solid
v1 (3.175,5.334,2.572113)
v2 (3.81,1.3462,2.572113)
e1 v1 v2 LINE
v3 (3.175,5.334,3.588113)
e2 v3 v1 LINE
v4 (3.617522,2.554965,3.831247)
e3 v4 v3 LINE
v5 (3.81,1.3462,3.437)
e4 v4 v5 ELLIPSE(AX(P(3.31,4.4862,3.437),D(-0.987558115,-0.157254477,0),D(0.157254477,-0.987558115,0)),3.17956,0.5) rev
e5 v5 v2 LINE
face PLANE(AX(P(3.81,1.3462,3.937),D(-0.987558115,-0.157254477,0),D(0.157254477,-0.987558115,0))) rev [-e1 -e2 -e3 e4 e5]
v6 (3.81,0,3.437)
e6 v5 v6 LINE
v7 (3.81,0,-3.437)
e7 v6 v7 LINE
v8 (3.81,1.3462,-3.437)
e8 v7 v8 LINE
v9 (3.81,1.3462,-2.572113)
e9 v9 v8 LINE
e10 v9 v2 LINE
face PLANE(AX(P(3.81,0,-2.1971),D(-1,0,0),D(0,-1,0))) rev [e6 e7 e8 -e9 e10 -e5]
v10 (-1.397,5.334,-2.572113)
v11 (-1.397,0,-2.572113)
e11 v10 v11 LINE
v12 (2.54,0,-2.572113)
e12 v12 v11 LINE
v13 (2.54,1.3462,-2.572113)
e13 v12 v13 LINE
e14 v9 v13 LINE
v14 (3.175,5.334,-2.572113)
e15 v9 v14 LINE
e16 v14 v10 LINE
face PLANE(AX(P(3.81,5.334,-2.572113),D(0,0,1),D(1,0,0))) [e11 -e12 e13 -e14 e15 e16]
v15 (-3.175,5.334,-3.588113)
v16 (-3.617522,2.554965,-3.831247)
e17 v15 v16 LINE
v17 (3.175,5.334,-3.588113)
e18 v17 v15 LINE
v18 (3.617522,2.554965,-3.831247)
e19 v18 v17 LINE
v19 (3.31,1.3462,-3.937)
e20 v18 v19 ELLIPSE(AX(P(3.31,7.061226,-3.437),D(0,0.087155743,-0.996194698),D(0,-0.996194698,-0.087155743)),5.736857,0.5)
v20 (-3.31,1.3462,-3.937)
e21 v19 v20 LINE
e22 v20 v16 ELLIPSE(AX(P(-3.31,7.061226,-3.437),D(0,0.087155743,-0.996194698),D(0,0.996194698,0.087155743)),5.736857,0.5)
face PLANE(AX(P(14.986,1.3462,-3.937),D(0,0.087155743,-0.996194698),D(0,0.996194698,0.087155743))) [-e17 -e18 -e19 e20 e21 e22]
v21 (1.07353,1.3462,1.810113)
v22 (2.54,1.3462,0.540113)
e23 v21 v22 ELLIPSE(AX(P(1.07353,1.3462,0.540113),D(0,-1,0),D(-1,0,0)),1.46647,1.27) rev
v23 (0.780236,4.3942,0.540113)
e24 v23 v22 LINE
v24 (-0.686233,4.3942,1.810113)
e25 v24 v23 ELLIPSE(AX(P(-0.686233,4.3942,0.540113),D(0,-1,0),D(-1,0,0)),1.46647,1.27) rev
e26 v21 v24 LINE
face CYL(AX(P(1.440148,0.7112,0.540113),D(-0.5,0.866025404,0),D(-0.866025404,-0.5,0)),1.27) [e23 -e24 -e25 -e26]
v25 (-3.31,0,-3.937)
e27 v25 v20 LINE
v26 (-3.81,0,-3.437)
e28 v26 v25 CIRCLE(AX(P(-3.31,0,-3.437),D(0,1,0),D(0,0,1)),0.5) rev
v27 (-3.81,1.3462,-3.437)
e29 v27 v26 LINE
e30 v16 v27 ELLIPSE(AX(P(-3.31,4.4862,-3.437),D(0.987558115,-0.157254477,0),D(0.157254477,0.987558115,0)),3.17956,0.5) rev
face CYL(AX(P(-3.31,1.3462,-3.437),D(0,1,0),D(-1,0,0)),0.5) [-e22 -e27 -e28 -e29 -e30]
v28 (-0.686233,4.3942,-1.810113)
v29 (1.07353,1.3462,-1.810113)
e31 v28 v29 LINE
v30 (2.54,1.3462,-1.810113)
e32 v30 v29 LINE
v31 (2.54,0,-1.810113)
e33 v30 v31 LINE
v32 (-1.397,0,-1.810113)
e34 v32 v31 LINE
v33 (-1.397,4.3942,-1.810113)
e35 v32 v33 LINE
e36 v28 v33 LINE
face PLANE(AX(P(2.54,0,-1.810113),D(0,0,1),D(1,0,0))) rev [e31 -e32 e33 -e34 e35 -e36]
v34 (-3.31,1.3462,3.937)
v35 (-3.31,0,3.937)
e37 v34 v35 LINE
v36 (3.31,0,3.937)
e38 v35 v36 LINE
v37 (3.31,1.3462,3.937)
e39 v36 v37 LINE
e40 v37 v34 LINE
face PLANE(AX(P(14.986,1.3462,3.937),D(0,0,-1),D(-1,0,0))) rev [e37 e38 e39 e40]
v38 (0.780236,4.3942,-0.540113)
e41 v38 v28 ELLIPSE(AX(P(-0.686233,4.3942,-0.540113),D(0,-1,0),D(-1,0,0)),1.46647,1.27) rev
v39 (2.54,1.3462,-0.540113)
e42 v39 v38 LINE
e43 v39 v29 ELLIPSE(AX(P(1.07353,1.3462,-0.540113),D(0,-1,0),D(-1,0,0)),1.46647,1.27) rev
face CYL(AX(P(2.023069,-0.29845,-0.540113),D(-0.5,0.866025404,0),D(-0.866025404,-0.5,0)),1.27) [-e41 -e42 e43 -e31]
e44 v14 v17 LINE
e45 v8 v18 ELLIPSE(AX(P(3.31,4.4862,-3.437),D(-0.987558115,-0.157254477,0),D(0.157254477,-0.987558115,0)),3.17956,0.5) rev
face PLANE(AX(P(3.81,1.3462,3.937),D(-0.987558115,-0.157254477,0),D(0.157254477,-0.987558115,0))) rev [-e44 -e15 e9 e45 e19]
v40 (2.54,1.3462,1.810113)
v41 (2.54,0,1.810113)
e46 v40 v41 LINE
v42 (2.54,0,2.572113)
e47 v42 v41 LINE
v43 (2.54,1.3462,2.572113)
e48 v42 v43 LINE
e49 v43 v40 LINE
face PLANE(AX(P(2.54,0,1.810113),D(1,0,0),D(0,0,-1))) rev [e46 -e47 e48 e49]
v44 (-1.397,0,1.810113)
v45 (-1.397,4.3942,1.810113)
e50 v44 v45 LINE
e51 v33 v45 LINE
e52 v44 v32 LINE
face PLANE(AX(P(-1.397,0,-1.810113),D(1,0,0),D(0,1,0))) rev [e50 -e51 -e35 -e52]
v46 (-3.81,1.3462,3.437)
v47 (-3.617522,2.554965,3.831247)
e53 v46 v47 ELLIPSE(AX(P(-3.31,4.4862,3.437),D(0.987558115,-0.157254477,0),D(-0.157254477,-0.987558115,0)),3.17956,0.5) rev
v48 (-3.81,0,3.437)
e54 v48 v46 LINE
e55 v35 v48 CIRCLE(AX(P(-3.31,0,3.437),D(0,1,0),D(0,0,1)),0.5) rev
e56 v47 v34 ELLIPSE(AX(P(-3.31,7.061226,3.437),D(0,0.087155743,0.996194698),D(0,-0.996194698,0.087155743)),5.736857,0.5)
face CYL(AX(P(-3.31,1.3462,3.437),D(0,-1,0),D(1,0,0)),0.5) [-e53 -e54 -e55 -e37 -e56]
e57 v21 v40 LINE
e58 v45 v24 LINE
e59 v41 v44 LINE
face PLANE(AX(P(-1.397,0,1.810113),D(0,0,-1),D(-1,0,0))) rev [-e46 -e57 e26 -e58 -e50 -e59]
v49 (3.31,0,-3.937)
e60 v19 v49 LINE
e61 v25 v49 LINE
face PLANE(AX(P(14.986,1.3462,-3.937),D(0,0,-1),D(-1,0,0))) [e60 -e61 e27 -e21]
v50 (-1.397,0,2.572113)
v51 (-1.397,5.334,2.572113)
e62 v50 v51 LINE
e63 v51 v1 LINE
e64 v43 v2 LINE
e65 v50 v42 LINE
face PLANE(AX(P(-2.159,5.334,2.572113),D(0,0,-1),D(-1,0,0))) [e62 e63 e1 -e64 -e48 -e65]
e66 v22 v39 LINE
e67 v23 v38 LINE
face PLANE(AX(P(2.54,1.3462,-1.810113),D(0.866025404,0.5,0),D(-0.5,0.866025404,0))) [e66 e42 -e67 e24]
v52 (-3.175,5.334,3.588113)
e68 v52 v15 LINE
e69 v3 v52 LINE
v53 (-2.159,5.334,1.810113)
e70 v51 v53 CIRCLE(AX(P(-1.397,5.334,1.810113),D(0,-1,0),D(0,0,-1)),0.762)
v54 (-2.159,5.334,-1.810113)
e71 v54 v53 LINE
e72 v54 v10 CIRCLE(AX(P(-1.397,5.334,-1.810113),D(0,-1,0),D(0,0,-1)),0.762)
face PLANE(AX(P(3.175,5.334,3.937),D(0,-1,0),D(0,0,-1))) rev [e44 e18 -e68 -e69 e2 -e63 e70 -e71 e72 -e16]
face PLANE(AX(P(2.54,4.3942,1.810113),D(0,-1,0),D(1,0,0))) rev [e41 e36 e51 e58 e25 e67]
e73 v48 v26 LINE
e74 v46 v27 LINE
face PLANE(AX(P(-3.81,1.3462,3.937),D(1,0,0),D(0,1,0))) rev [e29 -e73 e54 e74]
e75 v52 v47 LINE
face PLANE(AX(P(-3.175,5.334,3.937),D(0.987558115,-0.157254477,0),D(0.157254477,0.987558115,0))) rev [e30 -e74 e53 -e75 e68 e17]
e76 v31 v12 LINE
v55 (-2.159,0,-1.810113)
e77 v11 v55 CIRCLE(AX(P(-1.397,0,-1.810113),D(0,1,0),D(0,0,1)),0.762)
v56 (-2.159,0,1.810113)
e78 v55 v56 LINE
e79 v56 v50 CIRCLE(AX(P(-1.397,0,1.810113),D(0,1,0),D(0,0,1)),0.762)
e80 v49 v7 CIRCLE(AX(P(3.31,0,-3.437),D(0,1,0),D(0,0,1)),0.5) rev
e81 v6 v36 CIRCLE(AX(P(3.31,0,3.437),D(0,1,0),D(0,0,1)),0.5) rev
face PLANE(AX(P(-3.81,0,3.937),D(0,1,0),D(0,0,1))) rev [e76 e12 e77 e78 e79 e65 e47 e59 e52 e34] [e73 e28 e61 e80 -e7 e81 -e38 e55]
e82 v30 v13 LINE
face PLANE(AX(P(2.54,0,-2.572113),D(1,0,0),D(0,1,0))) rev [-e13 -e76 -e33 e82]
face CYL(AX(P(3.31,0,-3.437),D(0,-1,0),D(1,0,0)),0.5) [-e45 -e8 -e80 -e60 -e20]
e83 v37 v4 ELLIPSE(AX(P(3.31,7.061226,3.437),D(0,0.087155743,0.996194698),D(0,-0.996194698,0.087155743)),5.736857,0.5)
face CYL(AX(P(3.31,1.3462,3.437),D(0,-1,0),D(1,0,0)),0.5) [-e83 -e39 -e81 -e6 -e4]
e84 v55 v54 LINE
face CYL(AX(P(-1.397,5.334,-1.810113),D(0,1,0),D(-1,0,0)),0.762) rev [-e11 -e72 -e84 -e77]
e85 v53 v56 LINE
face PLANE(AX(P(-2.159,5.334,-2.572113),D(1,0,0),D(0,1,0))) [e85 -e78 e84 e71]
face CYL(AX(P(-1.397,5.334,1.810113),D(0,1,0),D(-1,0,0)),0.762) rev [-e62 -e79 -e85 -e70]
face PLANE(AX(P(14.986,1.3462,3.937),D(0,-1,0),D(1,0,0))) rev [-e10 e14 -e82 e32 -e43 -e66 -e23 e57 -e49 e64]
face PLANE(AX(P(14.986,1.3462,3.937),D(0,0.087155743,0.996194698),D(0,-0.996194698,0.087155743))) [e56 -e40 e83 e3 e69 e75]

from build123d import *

# Parameters (mm, degrees)
EXTRUDE1_DEPTH      = 3.937
DRAFT1_START        = -3.81
DRAFT1_DEPTH        = 7.62
SKETCH3_W           = 5.969
SKETCH3_H           = 5.144225416
CUT_EXTRUDE1_DEPTH  = 16.999459798
CUT_EXTRUDE2_DEPTH  = 16.999459798
SKETCH5_W           = 3.937
SKETCH5_H           = 3.620225416
EXTRUDE2_DEPTH      = 3.048
DRAFT2_ANGLE        = 30
FILLET1_R           = 1.27
FILLET2_R           = 0.762
SKETCH6_W           = 3.937
SKETCH6_H           = 3.620225416
EXTRUDE3_DEPTH      = 1.3462
CUT_EXTRUDE3_DEPTH  = 16.999459798
SKETCH12_W          = 4.3942
SKETCH12_H          = 1.3462
BOSS_EXTRUDE1_DEPTH = 70
CUT_EXTRUDE8_DEPTH  = 1.524
LPATTERN1_START     = -1.524
LPATTERN1_DEPTH     = 3.048
CUT_EXTRUDE9_DEPTH  = 86.170550743
FILLET3_R           = 1
CUT_EXTRUDE10_DEPTH = 85.172743295
FILLET4_R           = 0.5
CUT_EXTRUDE11_START = -1.3462
CUT_EXTRUDE11_DEPTH = 1.3462


# Read off the part's stored shape, not the designer's step: Draft1, LPattern1, Cut-Extrude11
with BuildPart() as part:
    # Sketch1 → Extrude1 (new, symmetric)
    with BuildSketch(Plane.XY):
        Polygon((3.81, 1.3462), (3.175, 5.334), (-3.175, 5.334), (-3.81, 1.3462), (-3.81, 0), (14.986, 0), (14.986, 1.3462), align=None)
    extrude(amount=EXTRUDE1_DEPTH, both=True)

    # Draft1 outline → Draft1 (cut)
    with BuildSketch(Plane.YZ.offset(DRAFT1_START)):
        Polygon((1.3462, 3.937), (5.334, 3.588112708), (5.334, 3.937), align=None)
        Polygon((5.334, -3.588112708), (1.3462, -3.937), (5.334, -3.937), align=None)
    extrude(amount=DRAFT1_DEPTH, mode=Mode.SUBTRACT)

    # Sketch3 → Cut-Extrude1 (cut, through all)
    with BuildSketch(Plane(origin=(0, 1.3462, 0), x_dir=(-1, 0, 0), z_dir=(0, 1, 0))):
        with Locations((-0.8255, 0)):
            Rectangle(SKETCH3_W, SKETCH3_H)
    extrude(amount=CUT_EXTRUDE1_DEPTH, mode=Mode.SUBTRACT)

    # Sketch4 → Cut-Extrude2 (cut, through all)
    with BuildSketch(Plane(origin=(0, 1.3462, 0), x_dir=(-1, 0, 0), z_dir=(0, 1, 0))):
        Polygon((2.159, 2.572112708), (-2.54, 2.572112708), (-2.54, 1.810112708), (1.397, 1.810112708), (1.397, -1.810112708), (-2.54, -1.810112708), (-2.54, -2.572112708), (2.159, -2.572112708), align=None)
    extrude(amount=-CUT_EXTRUDE2_DEPTH, mode=Mode.SUBTRACT)

    # Sketch5 → Extrude2 (add)
    with BuildSketch(Plane(origin=(0, 1.3462, 0), x_dir=(-1, 0, 0), z_dir=(0, 1, 0))):
        with Locations((-0.5715, 0)):
            Rectangle(SKETCH5_W, SKETCH5_H)
    extrude(amount=EXTRUDE2_DEPTH)

    # Draft2
    draft2_faces = [part.faces().sort_by_distance(p)[0] for p in [
        (2.54, 2.8702, 0),
    ]]
    draft(draft2_faces, Plane(origin=(14.986, 1.3462, 3.937), x_dir=(1, 0, 0), z_dir=(0, 1, 0)), DRAFT2_ANGLE)

    # Fillet1
    # the kernel refuses this fillet: 1.27 mm, written as the material it takes off along each edge
    with BuildSketch(Plane(origin=(4.1275, -1.403430657, 1.810112708), x_dir=(-0.866025403784438, -0.500000000000001, 0), z_dir=(-0.500000000000001, 0.866025403784438, 0))) as fillet1_piece_1_section:
        with BuildLine():
            CenterArc((FILLET1_R, -FILLET1_R), FILLET1_R, 90, 90)
            Line((0, -FILLET1_R), (0, 0))
            Line((0, 0), (FILLET1_R, 0))
        make_face()
    fillet1_piece_1 = extrude(amount=9.869527241, mode=Mode.PRIVATE)
    fillet1_piece_1 = split(fillet1_piece_1, bisect_by=Plane(origin=(2.54, 0.912532514, 1.637821639), z_dir=(-1, 0, 0)), keep=Keep.TOP, mode=Mode.PRIVATE)
    add(fillet1_piece_1, mode=Mode.SUBTRACT)
    with BuildSketch(Plane(origin=(4.1275, -1.403430657, -1.810112708), x_dir=(-0.8660254037844382, -0.500000000000001, 0), z_dir=(-0.500000000000001, 0.866025403784438, 0))) as fillet1_piece_2_section:
        with BuildLine():
            CenterArc((FILLET1_R, FILLET1_R), FILLET1_R, 180, 90)
            Line((0, FILLET1_R), (0, 0))
            Line((0, 0), (FILLET1_R, 0))
        make_face()
    fillet1_piece_2 = extrude(amount=9.869527241, mode=Mode.PRIVATE)
    fillet1_piece_2 = split(fillet1_piece_2, bisect_by=Plane(origin=(2.54, 0.912532514, -1.637821639), z_dir=(-1, 0, 0)), keep=Keep.TOP, mode=Mode.PRIVATE)
    add(fillet1_piece_2, mode=Mode.SUBTRACT)

    # Fillet2
    fillet2_edges = [part.edges().sort_by_distance(p)[0] for p in [
        (-2.159, 2.667, 2.572112708),
        (-2.159, 2.667, -2.572112708),
    ]]
    fillet(fillet2_edges, radius=FILLET2_R)

    # Sketch6 → Extrude3 (add)
    with BuildSketch(Plane.XZ):
        with Locations((0.5715, 0)):
            Rectangle(SKETCH6_W, SKETCH6_H)
    extrude(amount=-EXTRUDE3_DEPTH)

    # Sketch7 → Cut-Extrude3 (cut, through all)
    with BuildSketch(Plane(origin=(0, 1.3462, 0), x_dir=(-1, 0, 0), z_dir=(0, 1, 0))):
        Polygon((-14.986, 3.937), (-3.81, 3.937), (-10.668, 2.1971), (-14.986, 2.1971), align=None)
        Polygon((-14.986, -3.937), (-3.81, -3.937), (-10.668, -2.1971), (-14.986, -2.1971), align=None)
    extrude(amount=-CUT_EXTRUDE3_DEPTH, mode=Mode.SUBTRACT)

    # Sketch12 → Boss-Extrude1 (add)
    with BuildSketch(Plane(origin=(14.986, 0, 0), x_dir=(0, 0, -1), z_dir=(1, 0, 0))):
        with Locations((0, 0.6731)):
            Rectangle(SKETCH12_W, SKETCH12_H)
    extrude(amount=BOSS_EXTRUDE1_DEPTH)

    # Sketch11 → Cut-Extrude8 (cut, symmetric)
    with BuildSketch(Plane.XY):
        Polygon((10.668, 1.3462), (10.668, 1.0922), (11.684, 1.3462), (11.684, 1.637608524), (10.668, 1.637608524), align=None)
    extrude(amount=CUT_EXTRUDE8_DEPTH, both=True, mode=Mode.SUBTRACT)

    # LPattern1 outline → LPattern1 (cut)
    with BuildSketch(Plane.XY.offset(LPATTERN1_START)):
        Polygon((14.184, 1.3462), (13.168, 1.3462), (13.168, 1.0922), align=None)
        Polygon((79.184, 1.3462), (78.168, 1.3462), (78.168, 1.0922), align=None)
        Polygon((76.684, 1.3462), (75.668, 1.3462), (75.668, 1.0922), align=None)
        Polygon((74.184, 1.3462), (73.168, 1.3462), (73.168, 1.0922), align=None)
        Polygon((71.684, 1.3462), (70.668, 1.3462), (70.668, 1.0922), align=None)
        Polygon((69.184, 1.3462), (68.168, 1.3462), (68.168, 1.0922), align=None)
        Polygon((66.684, 1.3462), (65.668, 1.3462), (65.668, 1.0922), align=None)
        Polygon((64.184, 1.3462), (63.168, 1.3462), (63.168, 1.0922), align=None)
        Polygon((61.684, 1.3462), (60.668, 1.3462), (60.668, 1.0922), align=None)
        Polygon((59.184, 1.3462), (58.168, 1.3462), (58.168, 1.0922), align=None)
        Polygon((56.684, 1.3462), (55.668, 1.3462), (55.668, 1.0922), align=None)
        Polygon((54.184, 1.3462), (53.168, 1.3462), (53.168, 1.0922), align=None)
        Polygon((51.684, 1.3462), (50.668, 1.3462), (50.668, 1.0922), align=None)
        Polygon((49.184, 1.3462), (48.168, 1.3462), (48.168, 1.0922), align=None)
        Polygon((46.684, 1.3462), (45.668, 1.3462), (45.668, 1.0922), align=None)
        Polygon((44.184, 1.3462), (43.168, 1.3462), (43.168, 1.0922), align=None)
        Polygon((41.684, 1.3462), (40.668, 1.3462), (40.668, 1.0922), align=None)
        Polygon((39.184, 1.3462), (38.168, 1.3462), (38.168, 1.0922), align=None)
        Polygon((36.684, 1.3462), (35.668, 1.3462), (35.668, 1.0922), align=None)
        Polygon((34.184, 1.3462), (33.168, 1.3462), (33.168, 1.0922), align=None)
        Polygon((31.684, 1.3462), (30.668, 1.3462), (30.668, 1.0922), align=None)
        Polygon((29.184, 1.3462), (28.168, 1.3462), (28.168, 1.0922), align=None)
        Polygon((26.684, 1.3462), (25.668, 1.3462), (25.668, 1.0922), align=None)
        Polygon((24.184, 1.3462), (23.168, 1.3462), (23.168, 1.0922), align=None)
        Polygon((21.684, 1.3462), (20.668, 1.3462), (20.668, 1.0922), align=None)
        Polygon((19.184, 1.3462), (18.168, 1.3462), (18.168, 1.0922), align=None)
        Polygon((16.684, 1.3462), (15.668, 1.3462), (15.668, 1.0922), align=None)
    extrude(amount=LPATTERN1_DEPTH, mode=Mode.SUBTRACT)

    # Sketch13 → Cut-Extrude9 (cut, through all)
    with BuildSketch(Plane(origin=(0, 1.3462, 0), x_dir=(1, 0, 0), z_dir=(0, 1, 0))):
        Polygon((84.986, -2.1971), (84.986, 0), (81.180511171, -2.1971), align=None)
        Polygon((81.180511171, 2.1971), (84.986, 0), (84.986, 2.1971), align=None)
    extrude(amount=-CUT_EXTRUDE9_DEPTH, mode=Mode.SUBTRACT)

    # Fillet3
    fillet3_edges = [part.edges().sort_by_distance(p)[0] for p in [
        (84.986, 0.6731, 0),
    ]]
    fillet(fillet3_edges, radius=FILLET3_R)

    # Sketch14 → Cut-Extrude10 (cut, through all)
    with BuildSketch(Plane(origin=(0, 1.3462, 0), x_dir=(1, 0, 0), z_dir=(0, 1, 0))):
        Polygon((10.668, 2.1971), (3.81, 2.1971), (3.81, 3.937), align=None)
    cut_extrude10 = extrude(amount=-CUT_EXTRUDE10_DEPTH, mode=Mode.SUBTRACT)

    # Mirror1: Cut-Extrude10 across plane
    add(cut_extrude10.mirror(Plane.XY), mode=Mode.SUBTRACT)

    # Fillet4
    # the kernel refuses this fillet: 0.5 mm, written as the material it adds along each edge
    with BuildSketch(Plane(origin=(3.81, 1.3462, -2.1971), x_dir=(1, 0, 0), z_dir=(0, -1, 0)), Plane(origin=(3.81, 1.3462, 2.1971), x_dir=(0, 0, 1), z_dir=(0, -1, 0))) as fillet4_piece_1:
        with BuildLine():
            CenterArc((FILLET4_R, -FILLET4_R), FILLET4_R, 90, 90)
            Line((0, -FILLET4_R), (0, 0))
            Line((0, 0), (FILLET4_R, 0))
        make_face()
    extrude(amount=1.3462)
    # the kernel refuses this fillet: 0.5 mm, written as the material it takes off along each edge
    with BuildSketch(Plane(origin=(3.81, 2.5962, 3.937), x_dir=(0, 0, -1), z_dir=(0, -1, 0)), Plane(origin=(-3.81, 2.5962, 3.937), x_dir=(1, 0, 0), z_dir=(0, -1, 0)), Plane(origin=(3.81, 2.5962, -3.937), x_dir=(-1, 0, 0), z_dir=(0, -1, 0)), Plane(origin=(-3.81, 2.5962, -3.937), x_dir=(0, 0, 1), z_dir=(0, -1, 0))) as fillet4_2_piece_1:
        with BuildLine():
            CenterArc((FILLET4_R, -FILLET4_R), FILLET4_R, 90, 90)
            Line((0, -FILLET4_R), (0, 0))
            Line((0, 0), (FILLET4_R, 0))
        make_face()
    extrude(amount=3.8462, mode=Mode.SUBTRACT)

    # Cut-Extrude11 outline → Cut-Extrude11 (cut)
    with BuildSketch(Plane(origin=(0, 1.3462, 0), x_dir=(1, 0, 0), z_dir=(0, 1, 0)).offset(CUT_EXTRUDE11_START)):
        with BuildLine():
            ThreePointArc((4.31, 2.1971), (3.956446609, 2.343546609), (3.81, 2.6971))
            Line((3.81, 2.6971), (3.81, -2.6971))
            ThreePointArc((3.81, -2.6971), (3.956446609, -2.343546609), (4.31, -2.1971))
            Line((4.31, -2.1971), (81.180511171, -2.1971))
            Line((81.180511171, -2.1971), (83.486, -0.866025404))
            ThreePointArc((83.486, -0.866025404), (83.986, 0), (83.486, 0.866025404))
            Line((83.486, 0.866025404), (81.180511171, 2.1971))
            Line((81.180511171, 2.1971), (4.31, 2.1971))
        make_face()
    extrude(amount=CUT_EXTRUDE11_DEPTH, mode=Mode.SUBTRACT)


solid = part.part
